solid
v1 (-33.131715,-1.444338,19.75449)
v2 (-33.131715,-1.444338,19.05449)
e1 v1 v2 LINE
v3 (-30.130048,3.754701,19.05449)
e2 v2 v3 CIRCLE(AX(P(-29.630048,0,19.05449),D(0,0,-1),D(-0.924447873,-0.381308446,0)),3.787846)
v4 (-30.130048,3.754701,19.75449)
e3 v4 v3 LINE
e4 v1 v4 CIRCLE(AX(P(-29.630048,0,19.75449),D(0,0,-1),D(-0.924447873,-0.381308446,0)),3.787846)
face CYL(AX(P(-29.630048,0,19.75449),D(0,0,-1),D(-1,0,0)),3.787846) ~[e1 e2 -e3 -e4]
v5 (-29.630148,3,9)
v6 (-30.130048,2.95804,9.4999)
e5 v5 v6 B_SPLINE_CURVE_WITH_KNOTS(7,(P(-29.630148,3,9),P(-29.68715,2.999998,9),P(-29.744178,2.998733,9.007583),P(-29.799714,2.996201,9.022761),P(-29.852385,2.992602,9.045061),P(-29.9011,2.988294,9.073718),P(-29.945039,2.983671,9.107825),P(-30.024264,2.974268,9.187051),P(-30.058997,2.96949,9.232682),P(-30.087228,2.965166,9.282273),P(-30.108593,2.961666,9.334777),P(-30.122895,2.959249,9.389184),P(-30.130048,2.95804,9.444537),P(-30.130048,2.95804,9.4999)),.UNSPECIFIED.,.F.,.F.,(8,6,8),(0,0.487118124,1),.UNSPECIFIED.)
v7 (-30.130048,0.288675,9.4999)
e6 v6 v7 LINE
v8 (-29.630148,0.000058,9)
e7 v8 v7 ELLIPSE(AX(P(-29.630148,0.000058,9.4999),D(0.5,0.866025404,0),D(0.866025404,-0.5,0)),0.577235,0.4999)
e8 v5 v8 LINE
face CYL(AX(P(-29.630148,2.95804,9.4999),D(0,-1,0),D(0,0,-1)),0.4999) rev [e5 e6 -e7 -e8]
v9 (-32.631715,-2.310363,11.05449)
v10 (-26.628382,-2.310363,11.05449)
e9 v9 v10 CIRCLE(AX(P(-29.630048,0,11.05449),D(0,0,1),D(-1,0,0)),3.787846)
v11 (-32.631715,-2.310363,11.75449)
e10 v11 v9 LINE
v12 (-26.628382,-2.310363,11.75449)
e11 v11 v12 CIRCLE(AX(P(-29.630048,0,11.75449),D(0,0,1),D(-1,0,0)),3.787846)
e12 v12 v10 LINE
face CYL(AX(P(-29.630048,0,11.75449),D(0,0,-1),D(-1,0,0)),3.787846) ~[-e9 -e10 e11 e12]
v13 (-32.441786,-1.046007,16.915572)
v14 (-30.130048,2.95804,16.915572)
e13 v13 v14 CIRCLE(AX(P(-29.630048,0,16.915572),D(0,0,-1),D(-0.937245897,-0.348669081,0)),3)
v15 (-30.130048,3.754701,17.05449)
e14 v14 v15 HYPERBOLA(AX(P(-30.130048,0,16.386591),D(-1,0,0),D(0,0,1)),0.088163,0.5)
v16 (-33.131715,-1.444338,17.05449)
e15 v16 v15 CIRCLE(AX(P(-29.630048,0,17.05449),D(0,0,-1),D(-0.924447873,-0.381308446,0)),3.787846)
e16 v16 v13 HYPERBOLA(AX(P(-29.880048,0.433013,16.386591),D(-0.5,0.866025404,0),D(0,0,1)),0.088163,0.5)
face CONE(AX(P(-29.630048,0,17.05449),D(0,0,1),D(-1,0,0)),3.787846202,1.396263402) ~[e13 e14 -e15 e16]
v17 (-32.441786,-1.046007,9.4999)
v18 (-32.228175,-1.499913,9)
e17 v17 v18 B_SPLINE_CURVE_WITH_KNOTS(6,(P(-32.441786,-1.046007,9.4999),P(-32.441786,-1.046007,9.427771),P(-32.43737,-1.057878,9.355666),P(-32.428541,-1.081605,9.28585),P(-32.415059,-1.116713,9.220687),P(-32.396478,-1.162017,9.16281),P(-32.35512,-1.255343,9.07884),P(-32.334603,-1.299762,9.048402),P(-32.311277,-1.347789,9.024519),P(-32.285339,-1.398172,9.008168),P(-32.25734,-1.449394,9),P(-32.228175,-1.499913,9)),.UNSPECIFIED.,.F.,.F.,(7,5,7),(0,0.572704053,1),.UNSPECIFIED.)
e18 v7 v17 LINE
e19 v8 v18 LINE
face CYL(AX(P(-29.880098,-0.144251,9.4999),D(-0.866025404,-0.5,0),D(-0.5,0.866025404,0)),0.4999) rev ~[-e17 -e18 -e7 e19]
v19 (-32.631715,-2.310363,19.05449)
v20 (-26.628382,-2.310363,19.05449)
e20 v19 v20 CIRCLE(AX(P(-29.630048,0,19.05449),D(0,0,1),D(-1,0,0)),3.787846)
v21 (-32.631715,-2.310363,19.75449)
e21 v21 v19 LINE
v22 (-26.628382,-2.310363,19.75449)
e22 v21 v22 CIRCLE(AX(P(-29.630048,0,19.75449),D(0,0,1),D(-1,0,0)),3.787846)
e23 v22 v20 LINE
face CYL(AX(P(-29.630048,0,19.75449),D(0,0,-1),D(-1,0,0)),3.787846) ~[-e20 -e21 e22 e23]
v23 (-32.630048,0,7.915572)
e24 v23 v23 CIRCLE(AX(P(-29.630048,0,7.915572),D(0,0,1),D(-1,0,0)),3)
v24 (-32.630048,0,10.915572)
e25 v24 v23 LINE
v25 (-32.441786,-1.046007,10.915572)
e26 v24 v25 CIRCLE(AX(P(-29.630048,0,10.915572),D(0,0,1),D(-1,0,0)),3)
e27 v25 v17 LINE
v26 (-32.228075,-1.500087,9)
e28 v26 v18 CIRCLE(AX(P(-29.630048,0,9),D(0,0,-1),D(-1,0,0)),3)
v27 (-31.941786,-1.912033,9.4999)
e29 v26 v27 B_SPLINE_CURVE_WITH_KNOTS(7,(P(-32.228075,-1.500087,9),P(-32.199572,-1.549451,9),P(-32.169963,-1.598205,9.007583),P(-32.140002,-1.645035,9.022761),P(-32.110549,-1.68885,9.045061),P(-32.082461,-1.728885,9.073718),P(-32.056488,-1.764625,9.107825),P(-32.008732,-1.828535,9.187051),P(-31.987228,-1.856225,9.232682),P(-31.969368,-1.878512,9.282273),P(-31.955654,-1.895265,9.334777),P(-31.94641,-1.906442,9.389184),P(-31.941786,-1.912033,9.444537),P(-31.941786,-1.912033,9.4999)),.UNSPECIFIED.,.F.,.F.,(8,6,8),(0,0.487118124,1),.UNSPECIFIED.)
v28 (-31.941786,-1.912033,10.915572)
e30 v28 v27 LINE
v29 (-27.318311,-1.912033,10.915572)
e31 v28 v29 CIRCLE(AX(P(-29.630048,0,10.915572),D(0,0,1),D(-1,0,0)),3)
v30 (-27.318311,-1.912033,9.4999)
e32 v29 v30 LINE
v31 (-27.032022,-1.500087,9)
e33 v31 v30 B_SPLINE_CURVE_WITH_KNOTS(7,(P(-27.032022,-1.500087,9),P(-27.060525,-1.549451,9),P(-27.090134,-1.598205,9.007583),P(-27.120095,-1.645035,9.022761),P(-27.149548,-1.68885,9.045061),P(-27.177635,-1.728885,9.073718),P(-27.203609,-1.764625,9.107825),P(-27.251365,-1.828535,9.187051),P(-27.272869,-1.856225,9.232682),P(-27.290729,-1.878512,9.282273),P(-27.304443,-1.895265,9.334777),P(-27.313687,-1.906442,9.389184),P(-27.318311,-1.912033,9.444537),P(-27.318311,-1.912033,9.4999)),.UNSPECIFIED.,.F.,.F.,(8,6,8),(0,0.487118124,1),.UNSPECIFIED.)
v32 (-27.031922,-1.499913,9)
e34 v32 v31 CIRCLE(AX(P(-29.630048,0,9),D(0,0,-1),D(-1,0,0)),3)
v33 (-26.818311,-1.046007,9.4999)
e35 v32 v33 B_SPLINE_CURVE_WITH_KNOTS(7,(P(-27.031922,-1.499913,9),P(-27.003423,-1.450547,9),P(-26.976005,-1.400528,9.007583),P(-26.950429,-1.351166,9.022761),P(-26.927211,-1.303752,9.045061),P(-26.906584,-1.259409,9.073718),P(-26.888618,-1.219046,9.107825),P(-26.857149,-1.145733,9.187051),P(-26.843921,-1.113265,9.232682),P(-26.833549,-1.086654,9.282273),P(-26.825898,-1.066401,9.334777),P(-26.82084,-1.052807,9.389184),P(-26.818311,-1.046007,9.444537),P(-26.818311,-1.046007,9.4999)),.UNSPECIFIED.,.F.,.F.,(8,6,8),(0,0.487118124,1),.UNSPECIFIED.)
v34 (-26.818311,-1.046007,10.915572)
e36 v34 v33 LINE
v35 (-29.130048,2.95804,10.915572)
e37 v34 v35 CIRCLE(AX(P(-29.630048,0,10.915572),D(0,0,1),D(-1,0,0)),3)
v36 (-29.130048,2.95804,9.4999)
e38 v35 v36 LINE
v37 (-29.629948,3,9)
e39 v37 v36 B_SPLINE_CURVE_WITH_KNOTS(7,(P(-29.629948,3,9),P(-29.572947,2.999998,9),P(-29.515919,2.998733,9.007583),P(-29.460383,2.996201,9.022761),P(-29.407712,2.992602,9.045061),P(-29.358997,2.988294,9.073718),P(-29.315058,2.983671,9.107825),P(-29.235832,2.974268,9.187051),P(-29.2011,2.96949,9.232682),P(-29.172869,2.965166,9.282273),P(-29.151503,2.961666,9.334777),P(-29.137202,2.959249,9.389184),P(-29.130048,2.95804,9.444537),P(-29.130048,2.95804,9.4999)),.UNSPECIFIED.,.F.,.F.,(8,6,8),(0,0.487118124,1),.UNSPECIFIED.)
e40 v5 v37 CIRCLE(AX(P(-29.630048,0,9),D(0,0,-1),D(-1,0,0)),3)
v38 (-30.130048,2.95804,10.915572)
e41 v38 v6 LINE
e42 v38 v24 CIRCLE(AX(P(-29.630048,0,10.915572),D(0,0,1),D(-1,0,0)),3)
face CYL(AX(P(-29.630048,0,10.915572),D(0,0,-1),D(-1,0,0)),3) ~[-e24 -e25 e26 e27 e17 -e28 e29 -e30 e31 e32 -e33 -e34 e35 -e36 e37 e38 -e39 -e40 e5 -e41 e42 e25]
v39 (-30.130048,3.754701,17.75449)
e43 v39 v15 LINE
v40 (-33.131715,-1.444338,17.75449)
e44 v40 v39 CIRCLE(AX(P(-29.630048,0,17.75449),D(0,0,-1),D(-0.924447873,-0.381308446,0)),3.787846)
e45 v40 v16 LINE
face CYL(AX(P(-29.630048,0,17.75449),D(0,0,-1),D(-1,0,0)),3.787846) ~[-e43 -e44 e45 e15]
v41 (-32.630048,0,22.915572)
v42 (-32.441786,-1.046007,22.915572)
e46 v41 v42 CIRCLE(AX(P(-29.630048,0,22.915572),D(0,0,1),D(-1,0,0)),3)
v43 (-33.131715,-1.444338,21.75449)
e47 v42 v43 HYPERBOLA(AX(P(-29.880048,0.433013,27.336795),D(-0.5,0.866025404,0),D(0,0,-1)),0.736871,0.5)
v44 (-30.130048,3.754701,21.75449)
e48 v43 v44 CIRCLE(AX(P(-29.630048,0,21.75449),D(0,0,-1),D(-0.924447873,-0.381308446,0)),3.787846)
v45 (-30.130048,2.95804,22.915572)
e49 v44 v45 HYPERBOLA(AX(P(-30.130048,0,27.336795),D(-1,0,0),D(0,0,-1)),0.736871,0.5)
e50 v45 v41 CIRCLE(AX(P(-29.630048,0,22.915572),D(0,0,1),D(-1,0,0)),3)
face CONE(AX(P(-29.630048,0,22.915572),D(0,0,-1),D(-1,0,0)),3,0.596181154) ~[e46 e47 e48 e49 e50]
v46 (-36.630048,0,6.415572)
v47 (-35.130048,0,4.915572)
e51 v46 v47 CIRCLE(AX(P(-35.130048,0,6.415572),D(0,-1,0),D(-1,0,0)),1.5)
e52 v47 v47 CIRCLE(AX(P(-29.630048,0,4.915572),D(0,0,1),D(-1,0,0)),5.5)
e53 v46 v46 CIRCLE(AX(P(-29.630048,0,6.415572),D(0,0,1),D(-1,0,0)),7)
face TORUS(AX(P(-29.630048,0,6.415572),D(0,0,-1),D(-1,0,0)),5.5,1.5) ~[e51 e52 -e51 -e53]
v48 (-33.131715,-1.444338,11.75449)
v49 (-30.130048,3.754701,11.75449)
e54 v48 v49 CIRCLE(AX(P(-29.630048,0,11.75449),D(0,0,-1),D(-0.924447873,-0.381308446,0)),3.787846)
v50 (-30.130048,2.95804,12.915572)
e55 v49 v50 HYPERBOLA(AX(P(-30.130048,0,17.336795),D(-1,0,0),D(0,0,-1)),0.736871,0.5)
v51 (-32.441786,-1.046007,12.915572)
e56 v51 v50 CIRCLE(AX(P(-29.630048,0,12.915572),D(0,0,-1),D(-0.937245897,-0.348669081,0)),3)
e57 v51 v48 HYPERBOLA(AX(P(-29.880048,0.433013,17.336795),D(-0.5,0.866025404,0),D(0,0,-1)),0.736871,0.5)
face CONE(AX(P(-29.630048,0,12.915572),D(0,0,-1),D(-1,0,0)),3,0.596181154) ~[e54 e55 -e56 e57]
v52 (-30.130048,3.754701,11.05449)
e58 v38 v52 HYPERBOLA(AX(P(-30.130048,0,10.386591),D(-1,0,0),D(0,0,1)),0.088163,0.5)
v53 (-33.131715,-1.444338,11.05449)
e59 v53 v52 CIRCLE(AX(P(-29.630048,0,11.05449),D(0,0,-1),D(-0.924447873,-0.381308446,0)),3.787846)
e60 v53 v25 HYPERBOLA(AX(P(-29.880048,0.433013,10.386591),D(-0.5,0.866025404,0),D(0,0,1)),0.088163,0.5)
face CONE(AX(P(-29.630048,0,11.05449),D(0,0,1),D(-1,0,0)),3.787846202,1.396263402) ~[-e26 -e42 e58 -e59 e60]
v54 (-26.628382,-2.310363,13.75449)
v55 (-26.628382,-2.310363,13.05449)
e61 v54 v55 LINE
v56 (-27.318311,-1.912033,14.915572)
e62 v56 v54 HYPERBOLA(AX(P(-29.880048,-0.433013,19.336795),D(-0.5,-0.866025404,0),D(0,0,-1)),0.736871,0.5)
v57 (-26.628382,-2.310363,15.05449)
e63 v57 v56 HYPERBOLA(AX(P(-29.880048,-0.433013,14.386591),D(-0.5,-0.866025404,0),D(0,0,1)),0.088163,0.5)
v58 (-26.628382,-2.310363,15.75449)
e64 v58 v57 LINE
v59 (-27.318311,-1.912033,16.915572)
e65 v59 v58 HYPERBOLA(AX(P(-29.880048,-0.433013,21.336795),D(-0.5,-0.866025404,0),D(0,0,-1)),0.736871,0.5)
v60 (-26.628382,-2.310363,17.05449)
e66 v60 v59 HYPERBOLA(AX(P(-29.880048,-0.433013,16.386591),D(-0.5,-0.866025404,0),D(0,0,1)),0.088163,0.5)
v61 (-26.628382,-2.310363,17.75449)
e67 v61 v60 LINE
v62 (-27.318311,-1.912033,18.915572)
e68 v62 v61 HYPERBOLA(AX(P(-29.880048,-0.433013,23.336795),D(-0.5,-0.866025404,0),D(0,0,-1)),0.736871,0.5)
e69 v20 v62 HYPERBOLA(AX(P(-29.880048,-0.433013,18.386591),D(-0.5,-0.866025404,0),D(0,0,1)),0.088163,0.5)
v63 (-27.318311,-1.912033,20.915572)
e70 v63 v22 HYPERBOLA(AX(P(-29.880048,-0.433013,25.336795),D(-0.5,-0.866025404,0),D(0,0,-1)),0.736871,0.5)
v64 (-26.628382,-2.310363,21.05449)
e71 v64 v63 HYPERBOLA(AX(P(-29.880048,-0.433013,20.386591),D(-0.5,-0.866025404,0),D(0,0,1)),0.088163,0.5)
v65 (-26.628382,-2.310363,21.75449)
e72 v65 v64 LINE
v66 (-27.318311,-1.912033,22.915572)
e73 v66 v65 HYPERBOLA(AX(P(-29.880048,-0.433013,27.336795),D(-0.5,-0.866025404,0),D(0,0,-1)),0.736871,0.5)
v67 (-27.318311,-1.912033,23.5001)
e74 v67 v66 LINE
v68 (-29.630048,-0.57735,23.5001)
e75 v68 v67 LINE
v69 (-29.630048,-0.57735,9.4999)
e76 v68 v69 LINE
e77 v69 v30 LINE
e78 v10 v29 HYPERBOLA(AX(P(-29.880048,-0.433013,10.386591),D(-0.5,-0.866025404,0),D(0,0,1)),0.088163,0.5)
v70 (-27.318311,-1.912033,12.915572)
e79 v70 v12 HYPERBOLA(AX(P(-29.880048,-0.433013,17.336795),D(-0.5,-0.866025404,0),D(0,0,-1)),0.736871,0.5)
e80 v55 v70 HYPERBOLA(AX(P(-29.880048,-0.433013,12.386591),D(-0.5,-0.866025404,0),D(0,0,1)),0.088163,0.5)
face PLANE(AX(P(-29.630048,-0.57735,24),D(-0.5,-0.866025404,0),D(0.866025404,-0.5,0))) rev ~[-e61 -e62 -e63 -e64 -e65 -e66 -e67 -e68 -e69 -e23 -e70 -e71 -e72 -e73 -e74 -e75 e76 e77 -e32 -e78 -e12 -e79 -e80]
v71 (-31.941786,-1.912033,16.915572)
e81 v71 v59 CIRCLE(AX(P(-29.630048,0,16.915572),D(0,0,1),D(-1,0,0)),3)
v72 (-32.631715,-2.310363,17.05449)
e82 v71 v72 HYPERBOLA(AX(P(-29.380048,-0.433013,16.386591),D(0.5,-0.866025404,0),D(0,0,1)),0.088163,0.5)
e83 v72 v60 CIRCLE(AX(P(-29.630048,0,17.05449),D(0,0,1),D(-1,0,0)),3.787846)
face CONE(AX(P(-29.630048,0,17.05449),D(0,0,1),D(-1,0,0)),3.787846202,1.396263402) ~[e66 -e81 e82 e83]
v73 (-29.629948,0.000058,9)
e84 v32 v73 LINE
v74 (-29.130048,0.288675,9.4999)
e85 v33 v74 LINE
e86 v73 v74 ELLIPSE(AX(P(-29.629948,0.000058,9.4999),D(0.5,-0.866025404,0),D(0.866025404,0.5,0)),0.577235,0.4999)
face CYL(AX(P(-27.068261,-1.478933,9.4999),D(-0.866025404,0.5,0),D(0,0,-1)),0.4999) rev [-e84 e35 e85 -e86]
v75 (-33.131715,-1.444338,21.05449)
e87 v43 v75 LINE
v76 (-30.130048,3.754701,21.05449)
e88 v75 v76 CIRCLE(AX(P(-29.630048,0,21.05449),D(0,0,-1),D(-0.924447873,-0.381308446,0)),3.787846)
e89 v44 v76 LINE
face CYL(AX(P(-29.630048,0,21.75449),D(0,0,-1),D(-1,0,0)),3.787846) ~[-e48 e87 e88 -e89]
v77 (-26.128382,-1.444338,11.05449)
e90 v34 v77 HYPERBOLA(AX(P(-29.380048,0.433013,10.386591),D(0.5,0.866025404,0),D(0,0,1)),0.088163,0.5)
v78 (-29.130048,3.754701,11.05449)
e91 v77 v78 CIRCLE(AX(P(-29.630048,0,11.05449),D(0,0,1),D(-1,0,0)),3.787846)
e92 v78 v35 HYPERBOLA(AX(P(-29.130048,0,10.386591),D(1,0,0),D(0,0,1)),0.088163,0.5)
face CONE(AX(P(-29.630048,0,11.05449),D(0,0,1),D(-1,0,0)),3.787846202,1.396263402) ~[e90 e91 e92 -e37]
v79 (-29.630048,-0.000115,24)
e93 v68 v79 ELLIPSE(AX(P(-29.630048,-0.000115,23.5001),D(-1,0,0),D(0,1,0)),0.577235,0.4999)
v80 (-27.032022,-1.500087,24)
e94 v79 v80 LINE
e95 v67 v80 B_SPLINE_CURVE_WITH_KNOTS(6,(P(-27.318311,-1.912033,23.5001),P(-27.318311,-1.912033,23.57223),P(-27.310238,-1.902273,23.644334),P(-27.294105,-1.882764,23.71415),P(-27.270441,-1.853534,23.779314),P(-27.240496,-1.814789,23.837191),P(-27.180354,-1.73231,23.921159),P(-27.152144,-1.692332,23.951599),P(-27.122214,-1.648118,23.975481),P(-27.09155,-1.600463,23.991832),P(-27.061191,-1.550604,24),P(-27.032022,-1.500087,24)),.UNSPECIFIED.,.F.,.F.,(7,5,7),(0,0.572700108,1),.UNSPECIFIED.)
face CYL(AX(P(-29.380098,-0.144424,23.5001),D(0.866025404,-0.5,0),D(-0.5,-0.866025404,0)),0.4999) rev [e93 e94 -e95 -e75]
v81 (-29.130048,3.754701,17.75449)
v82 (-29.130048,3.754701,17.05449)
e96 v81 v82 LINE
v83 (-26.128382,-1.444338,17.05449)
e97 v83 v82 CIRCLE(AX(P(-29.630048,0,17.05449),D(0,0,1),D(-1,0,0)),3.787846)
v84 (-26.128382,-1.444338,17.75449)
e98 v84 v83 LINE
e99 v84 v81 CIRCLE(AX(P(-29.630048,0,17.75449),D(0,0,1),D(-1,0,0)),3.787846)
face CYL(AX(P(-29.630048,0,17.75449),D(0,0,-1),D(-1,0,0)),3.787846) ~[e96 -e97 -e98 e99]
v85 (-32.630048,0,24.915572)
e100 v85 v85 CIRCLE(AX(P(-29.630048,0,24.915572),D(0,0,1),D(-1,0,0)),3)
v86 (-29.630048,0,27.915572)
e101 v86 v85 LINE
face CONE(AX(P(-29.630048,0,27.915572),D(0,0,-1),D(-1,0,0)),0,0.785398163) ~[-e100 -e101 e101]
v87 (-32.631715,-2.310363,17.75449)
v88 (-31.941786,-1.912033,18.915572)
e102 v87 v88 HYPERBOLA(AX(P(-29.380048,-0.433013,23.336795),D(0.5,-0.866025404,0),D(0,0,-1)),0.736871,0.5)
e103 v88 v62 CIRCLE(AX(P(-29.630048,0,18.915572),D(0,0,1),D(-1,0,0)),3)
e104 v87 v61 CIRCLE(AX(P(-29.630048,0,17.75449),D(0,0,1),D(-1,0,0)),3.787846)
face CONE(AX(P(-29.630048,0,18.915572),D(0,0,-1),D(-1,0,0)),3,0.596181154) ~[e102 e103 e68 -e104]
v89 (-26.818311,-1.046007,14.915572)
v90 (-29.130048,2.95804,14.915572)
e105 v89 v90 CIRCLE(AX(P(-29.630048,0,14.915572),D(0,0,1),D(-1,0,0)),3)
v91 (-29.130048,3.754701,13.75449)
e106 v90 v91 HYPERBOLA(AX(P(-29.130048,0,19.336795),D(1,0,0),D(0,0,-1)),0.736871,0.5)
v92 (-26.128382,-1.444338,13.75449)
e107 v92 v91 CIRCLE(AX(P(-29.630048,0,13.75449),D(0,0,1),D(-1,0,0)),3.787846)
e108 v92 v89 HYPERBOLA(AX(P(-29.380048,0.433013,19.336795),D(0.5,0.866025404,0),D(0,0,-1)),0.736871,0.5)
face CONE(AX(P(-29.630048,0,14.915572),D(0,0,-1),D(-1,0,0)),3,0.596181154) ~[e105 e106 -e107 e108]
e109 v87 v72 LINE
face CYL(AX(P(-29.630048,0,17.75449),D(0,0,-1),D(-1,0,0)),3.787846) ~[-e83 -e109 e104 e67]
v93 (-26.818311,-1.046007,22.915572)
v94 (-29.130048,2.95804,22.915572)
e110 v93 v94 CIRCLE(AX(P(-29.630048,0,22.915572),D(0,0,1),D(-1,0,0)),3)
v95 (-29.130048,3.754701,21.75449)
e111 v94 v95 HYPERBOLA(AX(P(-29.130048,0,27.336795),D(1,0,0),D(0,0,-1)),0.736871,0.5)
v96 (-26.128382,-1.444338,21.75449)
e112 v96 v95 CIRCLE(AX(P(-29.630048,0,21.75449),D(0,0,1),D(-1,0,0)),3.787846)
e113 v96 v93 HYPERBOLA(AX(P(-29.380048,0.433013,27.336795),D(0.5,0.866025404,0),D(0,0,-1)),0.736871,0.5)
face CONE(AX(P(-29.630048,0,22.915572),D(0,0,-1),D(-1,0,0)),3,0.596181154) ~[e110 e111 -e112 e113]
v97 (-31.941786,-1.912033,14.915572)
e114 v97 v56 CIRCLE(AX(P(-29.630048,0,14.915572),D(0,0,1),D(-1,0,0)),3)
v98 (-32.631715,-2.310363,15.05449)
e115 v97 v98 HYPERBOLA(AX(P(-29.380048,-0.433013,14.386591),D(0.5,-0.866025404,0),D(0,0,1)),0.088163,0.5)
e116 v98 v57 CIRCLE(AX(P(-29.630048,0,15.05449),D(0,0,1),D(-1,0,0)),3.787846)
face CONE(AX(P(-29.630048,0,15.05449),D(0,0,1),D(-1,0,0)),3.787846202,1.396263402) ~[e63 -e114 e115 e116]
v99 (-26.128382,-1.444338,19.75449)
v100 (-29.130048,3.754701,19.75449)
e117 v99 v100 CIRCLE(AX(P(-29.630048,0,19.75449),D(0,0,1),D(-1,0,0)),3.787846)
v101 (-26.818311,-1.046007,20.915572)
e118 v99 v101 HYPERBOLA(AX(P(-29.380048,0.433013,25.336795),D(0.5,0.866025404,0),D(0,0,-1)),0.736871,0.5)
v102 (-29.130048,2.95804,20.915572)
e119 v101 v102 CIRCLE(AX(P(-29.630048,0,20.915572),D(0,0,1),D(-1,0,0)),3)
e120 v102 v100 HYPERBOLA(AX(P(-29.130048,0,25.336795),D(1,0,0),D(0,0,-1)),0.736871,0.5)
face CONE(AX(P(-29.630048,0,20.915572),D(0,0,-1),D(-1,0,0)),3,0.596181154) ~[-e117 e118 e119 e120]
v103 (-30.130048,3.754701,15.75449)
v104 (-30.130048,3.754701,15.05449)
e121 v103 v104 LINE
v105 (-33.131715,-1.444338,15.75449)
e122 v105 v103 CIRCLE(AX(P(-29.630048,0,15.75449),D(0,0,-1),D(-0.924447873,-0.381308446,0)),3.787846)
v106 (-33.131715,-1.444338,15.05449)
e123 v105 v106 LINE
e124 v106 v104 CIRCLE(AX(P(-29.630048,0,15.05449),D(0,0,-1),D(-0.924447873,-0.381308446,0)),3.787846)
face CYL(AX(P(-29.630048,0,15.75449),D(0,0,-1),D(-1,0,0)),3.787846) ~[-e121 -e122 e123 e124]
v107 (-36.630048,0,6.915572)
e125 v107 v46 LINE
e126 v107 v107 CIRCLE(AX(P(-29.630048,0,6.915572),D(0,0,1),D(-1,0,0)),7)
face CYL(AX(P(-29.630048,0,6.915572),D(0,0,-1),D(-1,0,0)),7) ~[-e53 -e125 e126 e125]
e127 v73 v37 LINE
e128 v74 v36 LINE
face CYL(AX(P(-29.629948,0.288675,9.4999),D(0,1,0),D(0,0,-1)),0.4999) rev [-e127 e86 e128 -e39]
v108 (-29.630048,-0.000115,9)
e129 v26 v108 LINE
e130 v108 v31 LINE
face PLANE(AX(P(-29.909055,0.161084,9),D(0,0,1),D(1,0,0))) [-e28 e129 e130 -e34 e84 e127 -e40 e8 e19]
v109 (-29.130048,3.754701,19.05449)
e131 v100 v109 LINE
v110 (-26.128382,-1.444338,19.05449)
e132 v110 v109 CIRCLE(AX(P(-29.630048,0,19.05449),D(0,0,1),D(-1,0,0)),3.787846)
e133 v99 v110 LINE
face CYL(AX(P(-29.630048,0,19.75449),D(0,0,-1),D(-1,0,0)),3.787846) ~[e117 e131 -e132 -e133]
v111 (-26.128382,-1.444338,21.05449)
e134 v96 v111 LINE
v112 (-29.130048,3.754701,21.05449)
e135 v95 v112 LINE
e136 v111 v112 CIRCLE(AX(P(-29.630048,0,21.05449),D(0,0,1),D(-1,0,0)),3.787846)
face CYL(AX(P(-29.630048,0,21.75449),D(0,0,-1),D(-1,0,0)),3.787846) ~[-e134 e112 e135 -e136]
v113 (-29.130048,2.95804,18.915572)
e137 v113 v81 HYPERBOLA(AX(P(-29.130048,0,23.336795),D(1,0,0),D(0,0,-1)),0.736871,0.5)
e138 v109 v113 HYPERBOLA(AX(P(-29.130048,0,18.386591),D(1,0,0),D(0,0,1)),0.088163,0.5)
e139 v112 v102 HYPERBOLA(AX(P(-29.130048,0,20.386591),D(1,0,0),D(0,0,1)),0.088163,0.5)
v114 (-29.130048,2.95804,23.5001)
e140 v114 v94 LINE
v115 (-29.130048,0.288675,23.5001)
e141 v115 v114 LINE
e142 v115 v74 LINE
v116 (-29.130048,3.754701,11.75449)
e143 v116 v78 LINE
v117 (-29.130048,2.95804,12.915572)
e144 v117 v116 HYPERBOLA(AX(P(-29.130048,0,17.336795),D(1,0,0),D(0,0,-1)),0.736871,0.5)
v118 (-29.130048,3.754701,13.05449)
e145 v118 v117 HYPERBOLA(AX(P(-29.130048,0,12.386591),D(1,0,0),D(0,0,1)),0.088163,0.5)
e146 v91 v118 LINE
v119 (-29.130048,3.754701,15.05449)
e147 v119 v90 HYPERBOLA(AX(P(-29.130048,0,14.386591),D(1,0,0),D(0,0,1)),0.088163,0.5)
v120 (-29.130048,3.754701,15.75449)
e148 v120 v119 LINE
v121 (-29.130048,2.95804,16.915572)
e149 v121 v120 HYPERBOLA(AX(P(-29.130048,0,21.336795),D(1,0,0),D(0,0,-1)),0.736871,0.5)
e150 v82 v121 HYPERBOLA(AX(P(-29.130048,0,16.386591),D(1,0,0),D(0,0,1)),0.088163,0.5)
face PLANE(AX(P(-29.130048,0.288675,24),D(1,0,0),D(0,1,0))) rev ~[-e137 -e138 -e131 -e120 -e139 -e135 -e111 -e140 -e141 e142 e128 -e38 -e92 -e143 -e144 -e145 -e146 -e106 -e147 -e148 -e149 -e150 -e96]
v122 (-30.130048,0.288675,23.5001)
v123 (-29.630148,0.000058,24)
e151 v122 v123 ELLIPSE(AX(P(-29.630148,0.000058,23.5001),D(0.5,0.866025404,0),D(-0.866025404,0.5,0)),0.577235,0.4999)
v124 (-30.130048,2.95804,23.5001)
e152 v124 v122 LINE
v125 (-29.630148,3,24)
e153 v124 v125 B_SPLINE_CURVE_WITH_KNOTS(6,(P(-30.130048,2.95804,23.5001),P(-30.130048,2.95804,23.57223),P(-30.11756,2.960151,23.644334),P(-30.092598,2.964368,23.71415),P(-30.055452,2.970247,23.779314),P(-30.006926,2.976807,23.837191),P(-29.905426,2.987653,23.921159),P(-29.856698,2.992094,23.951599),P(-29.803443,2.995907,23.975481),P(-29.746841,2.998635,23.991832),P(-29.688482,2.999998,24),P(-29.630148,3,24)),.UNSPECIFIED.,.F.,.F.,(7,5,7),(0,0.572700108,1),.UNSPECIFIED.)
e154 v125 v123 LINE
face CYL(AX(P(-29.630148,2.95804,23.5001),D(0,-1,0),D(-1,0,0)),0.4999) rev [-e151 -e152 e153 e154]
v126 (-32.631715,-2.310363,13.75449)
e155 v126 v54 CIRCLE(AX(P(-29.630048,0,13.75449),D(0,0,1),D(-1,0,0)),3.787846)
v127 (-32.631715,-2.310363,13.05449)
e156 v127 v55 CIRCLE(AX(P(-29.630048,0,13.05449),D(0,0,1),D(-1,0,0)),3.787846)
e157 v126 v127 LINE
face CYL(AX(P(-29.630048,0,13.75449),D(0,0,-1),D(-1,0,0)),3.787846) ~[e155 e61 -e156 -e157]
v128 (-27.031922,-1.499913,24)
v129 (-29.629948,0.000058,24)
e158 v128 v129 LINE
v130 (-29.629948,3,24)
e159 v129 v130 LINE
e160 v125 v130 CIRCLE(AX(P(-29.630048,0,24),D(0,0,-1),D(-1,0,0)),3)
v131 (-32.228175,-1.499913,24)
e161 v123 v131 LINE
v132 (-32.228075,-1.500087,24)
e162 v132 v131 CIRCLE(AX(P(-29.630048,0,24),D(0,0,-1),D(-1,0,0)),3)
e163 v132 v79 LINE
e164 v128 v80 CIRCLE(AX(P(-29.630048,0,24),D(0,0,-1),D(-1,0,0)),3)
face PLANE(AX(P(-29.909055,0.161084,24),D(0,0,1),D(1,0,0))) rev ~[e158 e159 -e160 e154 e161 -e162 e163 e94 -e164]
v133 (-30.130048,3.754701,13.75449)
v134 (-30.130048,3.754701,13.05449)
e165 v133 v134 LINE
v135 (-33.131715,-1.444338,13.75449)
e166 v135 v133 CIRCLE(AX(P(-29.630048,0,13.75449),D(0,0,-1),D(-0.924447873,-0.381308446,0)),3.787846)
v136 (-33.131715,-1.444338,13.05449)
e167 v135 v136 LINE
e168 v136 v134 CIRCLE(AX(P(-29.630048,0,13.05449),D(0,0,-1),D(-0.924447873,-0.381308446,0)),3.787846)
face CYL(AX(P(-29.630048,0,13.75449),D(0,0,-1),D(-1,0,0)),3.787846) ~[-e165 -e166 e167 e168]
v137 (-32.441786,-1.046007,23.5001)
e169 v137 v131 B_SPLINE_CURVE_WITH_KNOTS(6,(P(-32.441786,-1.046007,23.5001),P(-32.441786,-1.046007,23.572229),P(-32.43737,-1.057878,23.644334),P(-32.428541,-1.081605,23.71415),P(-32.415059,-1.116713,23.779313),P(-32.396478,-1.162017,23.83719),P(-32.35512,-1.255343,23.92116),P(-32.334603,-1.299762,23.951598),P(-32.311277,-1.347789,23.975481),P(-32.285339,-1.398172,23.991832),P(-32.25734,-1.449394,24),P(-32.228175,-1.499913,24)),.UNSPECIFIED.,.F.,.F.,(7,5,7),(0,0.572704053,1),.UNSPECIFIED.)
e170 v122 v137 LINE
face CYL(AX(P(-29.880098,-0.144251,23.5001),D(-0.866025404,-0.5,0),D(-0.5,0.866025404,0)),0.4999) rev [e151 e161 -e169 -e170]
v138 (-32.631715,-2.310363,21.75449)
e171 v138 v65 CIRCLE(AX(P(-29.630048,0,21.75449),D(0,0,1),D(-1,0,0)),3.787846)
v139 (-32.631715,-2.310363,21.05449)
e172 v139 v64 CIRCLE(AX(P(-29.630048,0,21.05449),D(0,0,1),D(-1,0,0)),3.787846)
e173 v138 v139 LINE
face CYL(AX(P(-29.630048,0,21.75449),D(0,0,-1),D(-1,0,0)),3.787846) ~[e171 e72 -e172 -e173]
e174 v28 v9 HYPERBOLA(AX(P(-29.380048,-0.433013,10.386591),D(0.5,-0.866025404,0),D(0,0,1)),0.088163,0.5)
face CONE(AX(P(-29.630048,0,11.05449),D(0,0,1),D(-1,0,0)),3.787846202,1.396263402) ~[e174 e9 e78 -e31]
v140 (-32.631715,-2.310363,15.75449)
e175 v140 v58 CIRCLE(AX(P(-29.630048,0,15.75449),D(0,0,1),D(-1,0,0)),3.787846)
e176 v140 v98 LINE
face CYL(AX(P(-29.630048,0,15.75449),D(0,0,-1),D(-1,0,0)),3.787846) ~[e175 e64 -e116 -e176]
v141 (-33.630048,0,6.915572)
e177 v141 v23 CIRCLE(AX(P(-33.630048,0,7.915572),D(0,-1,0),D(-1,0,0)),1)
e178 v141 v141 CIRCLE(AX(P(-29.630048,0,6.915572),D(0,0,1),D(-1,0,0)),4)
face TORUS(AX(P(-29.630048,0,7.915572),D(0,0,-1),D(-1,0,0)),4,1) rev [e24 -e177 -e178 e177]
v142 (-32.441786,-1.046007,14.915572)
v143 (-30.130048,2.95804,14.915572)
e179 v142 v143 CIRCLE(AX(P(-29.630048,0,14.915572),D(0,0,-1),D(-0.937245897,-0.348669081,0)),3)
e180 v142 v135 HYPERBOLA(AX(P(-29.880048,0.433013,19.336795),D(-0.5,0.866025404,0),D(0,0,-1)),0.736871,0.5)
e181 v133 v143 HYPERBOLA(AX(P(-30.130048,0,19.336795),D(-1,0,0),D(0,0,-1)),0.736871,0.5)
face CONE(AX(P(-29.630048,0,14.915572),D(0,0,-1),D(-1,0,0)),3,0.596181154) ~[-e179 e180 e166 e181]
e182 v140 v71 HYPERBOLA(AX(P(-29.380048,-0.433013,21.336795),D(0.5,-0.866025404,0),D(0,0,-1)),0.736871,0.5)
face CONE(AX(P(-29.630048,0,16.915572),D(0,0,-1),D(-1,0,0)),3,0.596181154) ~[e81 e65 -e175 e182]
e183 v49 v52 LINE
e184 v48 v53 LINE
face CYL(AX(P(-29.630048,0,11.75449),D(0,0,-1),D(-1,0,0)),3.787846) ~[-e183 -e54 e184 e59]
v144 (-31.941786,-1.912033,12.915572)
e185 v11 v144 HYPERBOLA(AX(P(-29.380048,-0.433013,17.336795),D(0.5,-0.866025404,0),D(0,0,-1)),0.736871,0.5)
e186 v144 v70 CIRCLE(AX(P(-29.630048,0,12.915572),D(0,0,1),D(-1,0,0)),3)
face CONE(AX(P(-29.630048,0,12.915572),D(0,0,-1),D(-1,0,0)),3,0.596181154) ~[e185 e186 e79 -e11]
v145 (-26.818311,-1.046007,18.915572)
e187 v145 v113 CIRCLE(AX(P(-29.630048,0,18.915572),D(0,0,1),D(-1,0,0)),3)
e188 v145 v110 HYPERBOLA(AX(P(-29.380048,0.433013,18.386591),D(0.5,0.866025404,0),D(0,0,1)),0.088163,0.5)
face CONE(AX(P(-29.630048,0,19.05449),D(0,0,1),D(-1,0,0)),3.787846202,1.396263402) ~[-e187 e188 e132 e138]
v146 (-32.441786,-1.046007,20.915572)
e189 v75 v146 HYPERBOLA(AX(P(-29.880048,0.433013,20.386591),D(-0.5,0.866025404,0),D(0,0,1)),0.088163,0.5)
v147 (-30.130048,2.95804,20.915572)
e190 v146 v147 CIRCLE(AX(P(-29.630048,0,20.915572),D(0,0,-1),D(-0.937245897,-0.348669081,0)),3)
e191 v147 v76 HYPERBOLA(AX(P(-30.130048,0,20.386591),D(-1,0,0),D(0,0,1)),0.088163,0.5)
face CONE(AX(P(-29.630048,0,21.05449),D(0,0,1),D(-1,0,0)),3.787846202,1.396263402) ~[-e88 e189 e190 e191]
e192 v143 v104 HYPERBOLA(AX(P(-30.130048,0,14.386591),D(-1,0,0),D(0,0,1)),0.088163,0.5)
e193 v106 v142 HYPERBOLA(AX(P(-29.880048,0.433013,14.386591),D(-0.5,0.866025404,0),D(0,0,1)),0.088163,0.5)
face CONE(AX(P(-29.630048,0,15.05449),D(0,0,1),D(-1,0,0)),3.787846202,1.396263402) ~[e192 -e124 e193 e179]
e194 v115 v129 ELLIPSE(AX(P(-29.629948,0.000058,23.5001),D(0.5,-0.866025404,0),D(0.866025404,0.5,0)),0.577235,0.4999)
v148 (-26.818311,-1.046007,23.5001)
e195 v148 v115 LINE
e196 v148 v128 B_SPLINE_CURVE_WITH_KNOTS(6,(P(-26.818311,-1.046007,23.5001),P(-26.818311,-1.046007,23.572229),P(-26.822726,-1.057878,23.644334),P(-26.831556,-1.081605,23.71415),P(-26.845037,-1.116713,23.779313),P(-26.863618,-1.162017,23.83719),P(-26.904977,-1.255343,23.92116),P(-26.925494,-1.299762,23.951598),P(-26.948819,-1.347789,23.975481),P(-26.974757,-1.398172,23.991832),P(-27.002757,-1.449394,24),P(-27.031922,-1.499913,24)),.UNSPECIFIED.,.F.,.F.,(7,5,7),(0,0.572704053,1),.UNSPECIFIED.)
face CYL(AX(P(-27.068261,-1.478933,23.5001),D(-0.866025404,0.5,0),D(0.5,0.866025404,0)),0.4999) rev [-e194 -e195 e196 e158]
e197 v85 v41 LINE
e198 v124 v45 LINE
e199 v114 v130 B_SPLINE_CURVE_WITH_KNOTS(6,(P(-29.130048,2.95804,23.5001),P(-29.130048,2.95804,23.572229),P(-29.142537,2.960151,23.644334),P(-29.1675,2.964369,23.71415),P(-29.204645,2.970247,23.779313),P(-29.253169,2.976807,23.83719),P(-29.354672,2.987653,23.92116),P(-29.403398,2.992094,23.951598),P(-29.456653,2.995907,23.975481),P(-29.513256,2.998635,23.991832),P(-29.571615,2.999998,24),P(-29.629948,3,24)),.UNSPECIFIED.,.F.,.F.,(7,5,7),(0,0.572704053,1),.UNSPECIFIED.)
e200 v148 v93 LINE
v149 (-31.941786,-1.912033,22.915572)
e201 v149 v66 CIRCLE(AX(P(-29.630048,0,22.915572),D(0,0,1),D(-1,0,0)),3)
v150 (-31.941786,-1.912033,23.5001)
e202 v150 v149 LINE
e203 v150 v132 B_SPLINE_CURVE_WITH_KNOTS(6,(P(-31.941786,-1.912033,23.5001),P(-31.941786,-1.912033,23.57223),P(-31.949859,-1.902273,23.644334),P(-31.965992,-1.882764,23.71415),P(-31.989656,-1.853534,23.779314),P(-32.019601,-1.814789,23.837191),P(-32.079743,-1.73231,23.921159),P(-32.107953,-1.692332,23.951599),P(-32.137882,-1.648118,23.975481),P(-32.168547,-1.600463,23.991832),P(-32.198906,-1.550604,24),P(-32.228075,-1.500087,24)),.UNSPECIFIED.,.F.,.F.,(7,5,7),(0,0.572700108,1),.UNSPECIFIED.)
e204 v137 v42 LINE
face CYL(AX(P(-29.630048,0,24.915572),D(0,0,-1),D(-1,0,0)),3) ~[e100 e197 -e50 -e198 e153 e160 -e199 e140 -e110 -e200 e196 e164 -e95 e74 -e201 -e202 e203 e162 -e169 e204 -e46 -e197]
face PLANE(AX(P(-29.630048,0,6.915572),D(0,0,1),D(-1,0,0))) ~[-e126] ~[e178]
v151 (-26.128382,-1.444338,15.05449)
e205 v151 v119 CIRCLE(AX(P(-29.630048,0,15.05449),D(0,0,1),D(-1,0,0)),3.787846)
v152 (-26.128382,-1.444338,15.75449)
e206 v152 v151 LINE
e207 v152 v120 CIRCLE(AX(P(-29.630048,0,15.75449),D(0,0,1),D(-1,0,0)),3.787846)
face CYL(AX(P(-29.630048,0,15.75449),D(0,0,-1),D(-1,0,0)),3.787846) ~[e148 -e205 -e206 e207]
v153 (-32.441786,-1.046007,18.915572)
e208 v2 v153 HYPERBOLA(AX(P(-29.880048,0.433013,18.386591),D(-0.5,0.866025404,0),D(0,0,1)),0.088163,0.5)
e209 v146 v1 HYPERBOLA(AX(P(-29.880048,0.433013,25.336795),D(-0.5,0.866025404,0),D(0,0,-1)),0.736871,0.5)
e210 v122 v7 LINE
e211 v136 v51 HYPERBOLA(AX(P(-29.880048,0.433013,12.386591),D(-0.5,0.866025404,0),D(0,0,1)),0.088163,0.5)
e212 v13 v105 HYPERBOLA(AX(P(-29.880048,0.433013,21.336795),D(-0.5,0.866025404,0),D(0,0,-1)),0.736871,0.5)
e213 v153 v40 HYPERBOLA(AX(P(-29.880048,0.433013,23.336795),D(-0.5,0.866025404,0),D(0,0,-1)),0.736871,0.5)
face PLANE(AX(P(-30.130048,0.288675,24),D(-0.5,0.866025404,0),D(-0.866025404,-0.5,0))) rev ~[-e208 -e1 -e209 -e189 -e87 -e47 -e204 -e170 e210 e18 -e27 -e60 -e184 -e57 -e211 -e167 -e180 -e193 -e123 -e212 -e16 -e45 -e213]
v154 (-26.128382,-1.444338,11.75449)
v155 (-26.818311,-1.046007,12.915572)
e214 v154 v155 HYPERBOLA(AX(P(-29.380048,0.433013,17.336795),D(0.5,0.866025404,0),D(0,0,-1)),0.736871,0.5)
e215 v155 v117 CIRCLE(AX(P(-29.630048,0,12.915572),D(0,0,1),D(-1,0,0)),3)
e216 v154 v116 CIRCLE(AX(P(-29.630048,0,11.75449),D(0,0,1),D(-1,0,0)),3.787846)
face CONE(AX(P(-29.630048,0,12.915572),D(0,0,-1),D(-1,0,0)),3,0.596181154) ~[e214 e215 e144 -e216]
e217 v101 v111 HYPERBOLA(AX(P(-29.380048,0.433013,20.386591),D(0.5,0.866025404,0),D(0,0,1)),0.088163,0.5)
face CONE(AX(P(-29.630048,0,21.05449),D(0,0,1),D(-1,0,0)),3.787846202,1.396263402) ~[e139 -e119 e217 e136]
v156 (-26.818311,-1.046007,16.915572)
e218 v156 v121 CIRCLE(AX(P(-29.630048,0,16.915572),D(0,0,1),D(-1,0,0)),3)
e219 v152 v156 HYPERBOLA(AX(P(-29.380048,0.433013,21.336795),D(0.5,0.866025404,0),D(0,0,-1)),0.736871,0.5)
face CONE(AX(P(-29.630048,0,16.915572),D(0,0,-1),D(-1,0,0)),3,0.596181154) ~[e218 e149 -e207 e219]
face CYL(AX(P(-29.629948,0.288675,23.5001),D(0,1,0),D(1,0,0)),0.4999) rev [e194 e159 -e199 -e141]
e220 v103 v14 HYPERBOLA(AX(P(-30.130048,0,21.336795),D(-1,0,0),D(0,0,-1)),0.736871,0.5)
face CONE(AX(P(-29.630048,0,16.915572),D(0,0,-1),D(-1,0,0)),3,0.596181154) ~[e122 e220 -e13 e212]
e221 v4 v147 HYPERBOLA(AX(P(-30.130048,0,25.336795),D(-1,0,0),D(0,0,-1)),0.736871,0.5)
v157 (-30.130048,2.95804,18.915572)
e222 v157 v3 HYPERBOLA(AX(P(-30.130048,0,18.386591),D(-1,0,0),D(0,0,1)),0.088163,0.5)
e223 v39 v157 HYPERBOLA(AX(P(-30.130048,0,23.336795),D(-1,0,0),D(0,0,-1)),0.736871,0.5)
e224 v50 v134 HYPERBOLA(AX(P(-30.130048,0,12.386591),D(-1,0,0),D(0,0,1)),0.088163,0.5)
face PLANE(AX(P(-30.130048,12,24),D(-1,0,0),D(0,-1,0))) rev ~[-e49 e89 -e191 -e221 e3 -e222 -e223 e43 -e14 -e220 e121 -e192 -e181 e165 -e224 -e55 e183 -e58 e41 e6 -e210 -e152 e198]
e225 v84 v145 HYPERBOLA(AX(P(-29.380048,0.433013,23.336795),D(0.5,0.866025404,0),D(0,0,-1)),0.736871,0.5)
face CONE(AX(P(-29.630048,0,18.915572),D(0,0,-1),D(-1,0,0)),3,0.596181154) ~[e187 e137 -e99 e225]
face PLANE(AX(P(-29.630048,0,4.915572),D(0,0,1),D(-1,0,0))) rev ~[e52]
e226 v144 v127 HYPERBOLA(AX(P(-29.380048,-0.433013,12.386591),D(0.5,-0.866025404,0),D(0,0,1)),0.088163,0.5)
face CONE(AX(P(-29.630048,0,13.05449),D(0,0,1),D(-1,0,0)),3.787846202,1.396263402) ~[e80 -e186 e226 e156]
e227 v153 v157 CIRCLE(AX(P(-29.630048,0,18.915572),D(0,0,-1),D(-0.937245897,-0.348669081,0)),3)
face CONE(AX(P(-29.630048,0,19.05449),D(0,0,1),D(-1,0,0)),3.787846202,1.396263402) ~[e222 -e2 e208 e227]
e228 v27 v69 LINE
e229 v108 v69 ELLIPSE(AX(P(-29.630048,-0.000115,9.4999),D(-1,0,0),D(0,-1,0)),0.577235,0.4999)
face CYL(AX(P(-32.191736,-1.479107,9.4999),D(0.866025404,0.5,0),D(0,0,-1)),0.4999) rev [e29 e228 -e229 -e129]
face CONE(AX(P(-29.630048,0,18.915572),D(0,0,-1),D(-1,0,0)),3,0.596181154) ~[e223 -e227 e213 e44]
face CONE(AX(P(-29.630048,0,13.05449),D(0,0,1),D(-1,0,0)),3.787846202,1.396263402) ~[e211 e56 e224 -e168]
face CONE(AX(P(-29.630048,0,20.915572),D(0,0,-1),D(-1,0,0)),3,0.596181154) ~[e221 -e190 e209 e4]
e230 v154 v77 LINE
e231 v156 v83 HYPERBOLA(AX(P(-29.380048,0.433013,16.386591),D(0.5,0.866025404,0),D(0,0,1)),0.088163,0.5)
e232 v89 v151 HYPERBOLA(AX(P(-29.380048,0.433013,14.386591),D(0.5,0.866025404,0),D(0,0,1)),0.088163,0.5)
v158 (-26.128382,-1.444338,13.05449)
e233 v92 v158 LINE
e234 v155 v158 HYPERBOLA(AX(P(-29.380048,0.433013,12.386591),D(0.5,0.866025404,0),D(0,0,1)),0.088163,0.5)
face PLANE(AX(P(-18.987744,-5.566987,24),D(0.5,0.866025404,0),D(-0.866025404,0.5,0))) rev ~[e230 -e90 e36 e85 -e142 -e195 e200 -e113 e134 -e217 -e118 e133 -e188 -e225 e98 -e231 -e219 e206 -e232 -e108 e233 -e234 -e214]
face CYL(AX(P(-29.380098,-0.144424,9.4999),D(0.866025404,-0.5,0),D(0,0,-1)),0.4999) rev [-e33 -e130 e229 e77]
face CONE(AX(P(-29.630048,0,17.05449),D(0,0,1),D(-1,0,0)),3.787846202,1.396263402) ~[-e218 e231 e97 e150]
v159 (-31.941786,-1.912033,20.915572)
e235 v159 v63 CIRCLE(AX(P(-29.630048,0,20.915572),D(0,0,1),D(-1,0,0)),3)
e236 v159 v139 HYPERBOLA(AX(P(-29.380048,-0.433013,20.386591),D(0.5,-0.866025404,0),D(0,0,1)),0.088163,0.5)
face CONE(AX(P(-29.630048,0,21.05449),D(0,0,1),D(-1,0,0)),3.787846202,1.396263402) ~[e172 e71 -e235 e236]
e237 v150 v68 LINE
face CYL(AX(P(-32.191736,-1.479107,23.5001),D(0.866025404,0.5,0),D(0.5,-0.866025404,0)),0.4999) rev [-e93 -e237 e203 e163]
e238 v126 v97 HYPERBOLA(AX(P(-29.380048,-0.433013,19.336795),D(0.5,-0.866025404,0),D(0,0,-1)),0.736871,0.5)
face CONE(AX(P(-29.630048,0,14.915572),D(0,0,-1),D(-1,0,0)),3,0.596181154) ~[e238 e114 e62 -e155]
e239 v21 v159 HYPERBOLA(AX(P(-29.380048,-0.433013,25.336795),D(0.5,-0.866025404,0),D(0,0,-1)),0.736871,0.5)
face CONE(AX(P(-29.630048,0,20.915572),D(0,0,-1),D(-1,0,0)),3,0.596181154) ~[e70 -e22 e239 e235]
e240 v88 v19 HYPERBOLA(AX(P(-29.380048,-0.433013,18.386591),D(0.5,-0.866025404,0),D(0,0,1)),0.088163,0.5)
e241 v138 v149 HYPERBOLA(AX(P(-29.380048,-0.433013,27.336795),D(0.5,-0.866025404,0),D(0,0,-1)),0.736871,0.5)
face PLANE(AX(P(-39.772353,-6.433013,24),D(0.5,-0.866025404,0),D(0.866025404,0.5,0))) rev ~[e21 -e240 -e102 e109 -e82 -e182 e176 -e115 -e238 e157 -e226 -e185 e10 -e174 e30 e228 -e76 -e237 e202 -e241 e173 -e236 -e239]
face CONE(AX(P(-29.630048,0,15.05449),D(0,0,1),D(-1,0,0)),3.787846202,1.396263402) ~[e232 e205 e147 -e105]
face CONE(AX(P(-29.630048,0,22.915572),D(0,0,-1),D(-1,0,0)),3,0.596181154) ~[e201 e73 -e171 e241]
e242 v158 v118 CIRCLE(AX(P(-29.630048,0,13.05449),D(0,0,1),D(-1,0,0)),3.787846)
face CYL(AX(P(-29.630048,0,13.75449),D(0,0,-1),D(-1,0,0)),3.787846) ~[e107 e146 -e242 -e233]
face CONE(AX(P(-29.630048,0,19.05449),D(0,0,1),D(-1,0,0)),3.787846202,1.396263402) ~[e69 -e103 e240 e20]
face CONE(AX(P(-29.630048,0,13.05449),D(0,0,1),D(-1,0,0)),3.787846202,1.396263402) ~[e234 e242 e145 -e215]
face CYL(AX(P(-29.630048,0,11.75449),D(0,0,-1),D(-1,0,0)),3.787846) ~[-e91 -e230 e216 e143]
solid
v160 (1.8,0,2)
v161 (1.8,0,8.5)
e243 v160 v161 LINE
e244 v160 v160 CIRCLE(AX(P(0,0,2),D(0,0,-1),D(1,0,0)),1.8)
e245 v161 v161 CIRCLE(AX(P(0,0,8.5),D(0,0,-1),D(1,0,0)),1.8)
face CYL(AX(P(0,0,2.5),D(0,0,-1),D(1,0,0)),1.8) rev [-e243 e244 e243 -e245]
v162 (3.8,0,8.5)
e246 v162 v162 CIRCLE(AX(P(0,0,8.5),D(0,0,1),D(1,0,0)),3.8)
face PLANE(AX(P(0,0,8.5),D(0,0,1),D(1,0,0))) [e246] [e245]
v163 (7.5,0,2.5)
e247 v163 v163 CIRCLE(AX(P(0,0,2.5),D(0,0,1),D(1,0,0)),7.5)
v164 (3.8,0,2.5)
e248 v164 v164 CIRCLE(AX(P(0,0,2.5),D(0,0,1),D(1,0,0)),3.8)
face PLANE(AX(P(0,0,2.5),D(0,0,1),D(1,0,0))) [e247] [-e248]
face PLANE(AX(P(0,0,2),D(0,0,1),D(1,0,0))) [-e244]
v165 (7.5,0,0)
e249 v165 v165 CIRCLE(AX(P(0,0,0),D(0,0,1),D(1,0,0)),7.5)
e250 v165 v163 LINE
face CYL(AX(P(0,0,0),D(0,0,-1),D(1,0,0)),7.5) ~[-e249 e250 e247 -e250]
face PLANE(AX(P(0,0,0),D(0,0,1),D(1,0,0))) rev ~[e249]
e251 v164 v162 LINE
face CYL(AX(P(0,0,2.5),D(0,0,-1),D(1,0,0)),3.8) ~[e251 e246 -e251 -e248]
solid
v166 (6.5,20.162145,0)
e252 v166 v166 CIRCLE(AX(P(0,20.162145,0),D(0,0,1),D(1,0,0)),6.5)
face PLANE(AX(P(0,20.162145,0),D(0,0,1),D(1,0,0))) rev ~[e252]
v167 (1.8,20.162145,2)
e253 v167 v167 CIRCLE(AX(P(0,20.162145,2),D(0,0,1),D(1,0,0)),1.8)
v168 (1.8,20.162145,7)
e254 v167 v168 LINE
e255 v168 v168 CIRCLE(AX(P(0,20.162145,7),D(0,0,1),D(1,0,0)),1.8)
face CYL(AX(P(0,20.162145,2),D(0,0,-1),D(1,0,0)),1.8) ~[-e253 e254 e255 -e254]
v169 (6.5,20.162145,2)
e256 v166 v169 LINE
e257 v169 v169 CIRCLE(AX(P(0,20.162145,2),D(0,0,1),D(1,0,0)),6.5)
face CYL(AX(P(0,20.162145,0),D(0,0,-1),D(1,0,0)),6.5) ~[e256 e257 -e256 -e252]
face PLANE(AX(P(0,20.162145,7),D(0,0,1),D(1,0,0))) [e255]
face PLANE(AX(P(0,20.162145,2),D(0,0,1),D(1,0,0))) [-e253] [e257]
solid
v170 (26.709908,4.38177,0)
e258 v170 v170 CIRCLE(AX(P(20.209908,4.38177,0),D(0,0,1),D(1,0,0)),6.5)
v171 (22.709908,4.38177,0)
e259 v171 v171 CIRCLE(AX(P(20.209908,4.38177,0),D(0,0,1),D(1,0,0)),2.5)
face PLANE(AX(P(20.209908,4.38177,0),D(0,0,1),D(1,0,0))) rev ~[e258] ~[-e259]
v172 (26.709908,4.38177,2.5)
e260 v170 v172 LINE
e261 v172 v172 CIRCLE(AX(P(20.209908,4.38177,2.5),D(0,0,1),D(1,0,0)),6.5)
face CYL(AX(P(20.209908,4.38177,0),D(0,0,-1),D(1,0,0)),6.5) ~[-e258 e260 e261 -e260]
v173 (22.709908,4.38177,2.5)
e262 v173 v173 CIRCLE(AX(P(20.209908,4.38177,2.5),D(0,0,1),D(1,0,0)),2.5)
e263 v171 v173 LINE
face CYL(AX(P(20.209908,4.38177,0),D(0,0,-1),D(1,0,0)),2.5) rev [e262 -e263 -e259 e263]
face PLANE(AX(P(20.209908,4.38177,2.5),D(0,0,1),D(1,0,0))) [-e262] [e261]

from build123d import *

# Parameters (mm, degrees)
F0_R      = 7.5
F1_DEPTH  = 2.5
F2_R      = 3.8
F3_DEPTH  = 6
F4_T      = -2
F5_R      = 6.5
F6_DEPTH  = 2
F7_R      = 1.8
F8_DEPTH  = 5
F9_R      = 6.5
F9_R_2    = 2.5
F10_DEPTH = 2.5
F15_DEPTH = 15
F16_R     = 1
F17_R     = 1.5
F18_R     = 0.4999


# Not quite as in the source:
# - a fillet or chamfer is up to 0.001 mm smaller than in the source, because OpenCascade refuses the exact size
# - a feature names something its author has since deleted; it is built from what else it names


with BuildPart() as f1:
    # F0 (on Top) → F1 (new body)
    with BuildSketch(Plane.XY):
        Circle(F0_R)
    extrude(amount=F1_DEPTH)

    # F2 (on face) → F3 (join)
    with BuildSketch(Plane.XY.offset(2.5)):
        Circle(F2_R)
    extrude(amount=F3_DEPTH)

    # F4
    f4_openings = [f1.faces().sort_by_distance(p)[0] for p in [
        (0, 0, 8.5),
    ]]
    offset(amount=F4_T, openings=f4_openings, kind=Kind.INTERSECTION)


with BuildPart() as f6:
    # F5 (on Top) → F6 (new body)
    with BuildSketch(Plane.XY):
        with Locations((0, 20.1621446759)):
            Circle(F5_R)
    extrude(amount=F6_DEPTH)

    # F7 (on face) → F8 (join)
    with BuildSketch(Plane.XY.offset(2)):
        with Locations((0, 20.1621446759)):
            Circle(F7_R)
    extrude(amount=F8_DEPTH)


with BuildPart() as f10:
    # F9 (on Top) → F10 (new body)
    with BuildSketch(Plane.XY):
        with Locations((20.2099084854, 4.3817702681)):
            Circle(F9_R)
        with Locations((20.2099084854, 4.3817702681)):
            Circle(F9_R_2, mode=Mode.SUBTRACT)
    extrude(amount=F10_DEPTH)


with BuildPart() as f12:
    # F11 (on Front) → F12 (revolve)
    with BuildSketch(Plane.XZ):
        Polygon((-36.6300484105, 4.9155716072), (-29.6300484105, 4.9155716072), (-29.6300484105, 27.9155716072), (-32.6300484105, 24.9155716072), (-32.6300484105, 22.9155716072), (-33.4178946129, 21.7544901494), (-33.4178946129, 21.0544901494), (-32.6300484105, 20.9155716072), (-33.4178946129, 19.7544901494), (-33.4178946129, 19.0544901494), (-32.6300484105, 18.9155716072), (-33.4178946129, 17.7544901494), (-33.4178946129, 17.0544901494), (-32.6300484105, 16.9155716072), (-33.4178946129, 15.7544901494), (-33.4178946129, 15.0544901494), (-32.6300484105, 14.9155716072), (-33.4178946129, 13.7544901494), (-33.4178946129, 13.0544901494), (-32.6300484105, 12.9155716072), (-33.4178946129, 11.7544901494), (-33.4178946129, 11.0544901494), (-32.6300484105, 10.9155716072), (-32.6300484105, 6.9155716072), (-36.6300484105, 6.9155716072), align=None)
    revolve(axis=Axis((-29.6300484105, 0, 16.4155716072), (0, 0, 1)))

    # F14 (on offset) → F15 (cut)
    with BuildSketch(Plane.XY.offset(24)):
        Polygon((-30.1300484105, 0.2886751346), (-30.1300484105, 0), (-29.6300484105, 0), (-29.8800484105, 0.4330127019), align=None)
        Polygon((-29.6300484105, 0), (-30.1300484105, 0), (-30.1300484105, 0.2886751346), (-40.2723532559, -5.5669872981), (-39.7723532559, -6.4330127019), (-29.6300484105, -0.5773502692), (-29.8800484105, -0.4330127019), align=None)
        Polygon((-29.3800484105, 0.4330127019), (-29.6300484105, 0), (-29.1300484105, 0), (-29.1300484105, 0.2886751346), align=None)
        Polygon((-29.1300484105, 0), (-29.6300484105, 0), (-29.3800484105, -0.4330127019), (-29.6300484105, -0.5773502692), (-19.487743565, -6.4330127019), (-18.987743565, -5.5669872981), (-29.1300484105, 0.2886751346), align=None)
        Polygon((-29.8800484105, 0.4330127019), (-29.6300484105, 0), (-29.3800484105, 0.4330127019), (-29.1300484105, 0.2886751346), (-29.1300484105, 12), (-30.1300484105, 12), (-30.1300484105, 0.2886751346), align=None)
        Polygon((-29.3800484105, -0.4330127019), (-29.6300484105, 0), (-29.8800484105, -0.4330127019), (-29.6300484105, -0.5773502692), align=None)
    extrude(amount=-F15_DEPTH, mode=Mode.SUBTRACT)

    # F16
    f16_edges = [f12.edges().sort_by_distance(p)[0] for p in [
        (-26.630048, 0, 6.915572),
    ]]
    fillet(f16_edges, radius=F16_R)

    # F17
    f17_edges = [f12.edges().sort_by_distance(p)[0] for p in [
        (-22.630048, 0, 4.915572),
    ]]
    fillet(f17_edges, radius=F17_R)

    # F18 (radius 0.5 in the source; OpenCascade refuses exactly that, so slightly less here)
    f18_edges = [f12.edges().sort_by_distance(p)[0] for p in [
        (-29.130048, 1.623358, 9),
        (-30.130048, 1.623358, 9),
        (-27.97418, -0.378666, 9),
        (-28.47418, -1.244691, 9),
        (-31.285917, -0.378666, 9),
        (-30.785917, -1.244691, 9),
        (-29.130048, 1.623358, 24),
        (-31.285917, -0.378666, 24),
        (-27.97418, -0.378666, 24),
        (-30.785917, -1.244691, 24),
        (-30.130048, 1.623358, 24),
        (-28.47418, -1.244691, 24),
    ]]
    fillet(f18_edges, radius=F18_R)


solid = Compound([f1.part, f6.part, f10.part, f12.part])
